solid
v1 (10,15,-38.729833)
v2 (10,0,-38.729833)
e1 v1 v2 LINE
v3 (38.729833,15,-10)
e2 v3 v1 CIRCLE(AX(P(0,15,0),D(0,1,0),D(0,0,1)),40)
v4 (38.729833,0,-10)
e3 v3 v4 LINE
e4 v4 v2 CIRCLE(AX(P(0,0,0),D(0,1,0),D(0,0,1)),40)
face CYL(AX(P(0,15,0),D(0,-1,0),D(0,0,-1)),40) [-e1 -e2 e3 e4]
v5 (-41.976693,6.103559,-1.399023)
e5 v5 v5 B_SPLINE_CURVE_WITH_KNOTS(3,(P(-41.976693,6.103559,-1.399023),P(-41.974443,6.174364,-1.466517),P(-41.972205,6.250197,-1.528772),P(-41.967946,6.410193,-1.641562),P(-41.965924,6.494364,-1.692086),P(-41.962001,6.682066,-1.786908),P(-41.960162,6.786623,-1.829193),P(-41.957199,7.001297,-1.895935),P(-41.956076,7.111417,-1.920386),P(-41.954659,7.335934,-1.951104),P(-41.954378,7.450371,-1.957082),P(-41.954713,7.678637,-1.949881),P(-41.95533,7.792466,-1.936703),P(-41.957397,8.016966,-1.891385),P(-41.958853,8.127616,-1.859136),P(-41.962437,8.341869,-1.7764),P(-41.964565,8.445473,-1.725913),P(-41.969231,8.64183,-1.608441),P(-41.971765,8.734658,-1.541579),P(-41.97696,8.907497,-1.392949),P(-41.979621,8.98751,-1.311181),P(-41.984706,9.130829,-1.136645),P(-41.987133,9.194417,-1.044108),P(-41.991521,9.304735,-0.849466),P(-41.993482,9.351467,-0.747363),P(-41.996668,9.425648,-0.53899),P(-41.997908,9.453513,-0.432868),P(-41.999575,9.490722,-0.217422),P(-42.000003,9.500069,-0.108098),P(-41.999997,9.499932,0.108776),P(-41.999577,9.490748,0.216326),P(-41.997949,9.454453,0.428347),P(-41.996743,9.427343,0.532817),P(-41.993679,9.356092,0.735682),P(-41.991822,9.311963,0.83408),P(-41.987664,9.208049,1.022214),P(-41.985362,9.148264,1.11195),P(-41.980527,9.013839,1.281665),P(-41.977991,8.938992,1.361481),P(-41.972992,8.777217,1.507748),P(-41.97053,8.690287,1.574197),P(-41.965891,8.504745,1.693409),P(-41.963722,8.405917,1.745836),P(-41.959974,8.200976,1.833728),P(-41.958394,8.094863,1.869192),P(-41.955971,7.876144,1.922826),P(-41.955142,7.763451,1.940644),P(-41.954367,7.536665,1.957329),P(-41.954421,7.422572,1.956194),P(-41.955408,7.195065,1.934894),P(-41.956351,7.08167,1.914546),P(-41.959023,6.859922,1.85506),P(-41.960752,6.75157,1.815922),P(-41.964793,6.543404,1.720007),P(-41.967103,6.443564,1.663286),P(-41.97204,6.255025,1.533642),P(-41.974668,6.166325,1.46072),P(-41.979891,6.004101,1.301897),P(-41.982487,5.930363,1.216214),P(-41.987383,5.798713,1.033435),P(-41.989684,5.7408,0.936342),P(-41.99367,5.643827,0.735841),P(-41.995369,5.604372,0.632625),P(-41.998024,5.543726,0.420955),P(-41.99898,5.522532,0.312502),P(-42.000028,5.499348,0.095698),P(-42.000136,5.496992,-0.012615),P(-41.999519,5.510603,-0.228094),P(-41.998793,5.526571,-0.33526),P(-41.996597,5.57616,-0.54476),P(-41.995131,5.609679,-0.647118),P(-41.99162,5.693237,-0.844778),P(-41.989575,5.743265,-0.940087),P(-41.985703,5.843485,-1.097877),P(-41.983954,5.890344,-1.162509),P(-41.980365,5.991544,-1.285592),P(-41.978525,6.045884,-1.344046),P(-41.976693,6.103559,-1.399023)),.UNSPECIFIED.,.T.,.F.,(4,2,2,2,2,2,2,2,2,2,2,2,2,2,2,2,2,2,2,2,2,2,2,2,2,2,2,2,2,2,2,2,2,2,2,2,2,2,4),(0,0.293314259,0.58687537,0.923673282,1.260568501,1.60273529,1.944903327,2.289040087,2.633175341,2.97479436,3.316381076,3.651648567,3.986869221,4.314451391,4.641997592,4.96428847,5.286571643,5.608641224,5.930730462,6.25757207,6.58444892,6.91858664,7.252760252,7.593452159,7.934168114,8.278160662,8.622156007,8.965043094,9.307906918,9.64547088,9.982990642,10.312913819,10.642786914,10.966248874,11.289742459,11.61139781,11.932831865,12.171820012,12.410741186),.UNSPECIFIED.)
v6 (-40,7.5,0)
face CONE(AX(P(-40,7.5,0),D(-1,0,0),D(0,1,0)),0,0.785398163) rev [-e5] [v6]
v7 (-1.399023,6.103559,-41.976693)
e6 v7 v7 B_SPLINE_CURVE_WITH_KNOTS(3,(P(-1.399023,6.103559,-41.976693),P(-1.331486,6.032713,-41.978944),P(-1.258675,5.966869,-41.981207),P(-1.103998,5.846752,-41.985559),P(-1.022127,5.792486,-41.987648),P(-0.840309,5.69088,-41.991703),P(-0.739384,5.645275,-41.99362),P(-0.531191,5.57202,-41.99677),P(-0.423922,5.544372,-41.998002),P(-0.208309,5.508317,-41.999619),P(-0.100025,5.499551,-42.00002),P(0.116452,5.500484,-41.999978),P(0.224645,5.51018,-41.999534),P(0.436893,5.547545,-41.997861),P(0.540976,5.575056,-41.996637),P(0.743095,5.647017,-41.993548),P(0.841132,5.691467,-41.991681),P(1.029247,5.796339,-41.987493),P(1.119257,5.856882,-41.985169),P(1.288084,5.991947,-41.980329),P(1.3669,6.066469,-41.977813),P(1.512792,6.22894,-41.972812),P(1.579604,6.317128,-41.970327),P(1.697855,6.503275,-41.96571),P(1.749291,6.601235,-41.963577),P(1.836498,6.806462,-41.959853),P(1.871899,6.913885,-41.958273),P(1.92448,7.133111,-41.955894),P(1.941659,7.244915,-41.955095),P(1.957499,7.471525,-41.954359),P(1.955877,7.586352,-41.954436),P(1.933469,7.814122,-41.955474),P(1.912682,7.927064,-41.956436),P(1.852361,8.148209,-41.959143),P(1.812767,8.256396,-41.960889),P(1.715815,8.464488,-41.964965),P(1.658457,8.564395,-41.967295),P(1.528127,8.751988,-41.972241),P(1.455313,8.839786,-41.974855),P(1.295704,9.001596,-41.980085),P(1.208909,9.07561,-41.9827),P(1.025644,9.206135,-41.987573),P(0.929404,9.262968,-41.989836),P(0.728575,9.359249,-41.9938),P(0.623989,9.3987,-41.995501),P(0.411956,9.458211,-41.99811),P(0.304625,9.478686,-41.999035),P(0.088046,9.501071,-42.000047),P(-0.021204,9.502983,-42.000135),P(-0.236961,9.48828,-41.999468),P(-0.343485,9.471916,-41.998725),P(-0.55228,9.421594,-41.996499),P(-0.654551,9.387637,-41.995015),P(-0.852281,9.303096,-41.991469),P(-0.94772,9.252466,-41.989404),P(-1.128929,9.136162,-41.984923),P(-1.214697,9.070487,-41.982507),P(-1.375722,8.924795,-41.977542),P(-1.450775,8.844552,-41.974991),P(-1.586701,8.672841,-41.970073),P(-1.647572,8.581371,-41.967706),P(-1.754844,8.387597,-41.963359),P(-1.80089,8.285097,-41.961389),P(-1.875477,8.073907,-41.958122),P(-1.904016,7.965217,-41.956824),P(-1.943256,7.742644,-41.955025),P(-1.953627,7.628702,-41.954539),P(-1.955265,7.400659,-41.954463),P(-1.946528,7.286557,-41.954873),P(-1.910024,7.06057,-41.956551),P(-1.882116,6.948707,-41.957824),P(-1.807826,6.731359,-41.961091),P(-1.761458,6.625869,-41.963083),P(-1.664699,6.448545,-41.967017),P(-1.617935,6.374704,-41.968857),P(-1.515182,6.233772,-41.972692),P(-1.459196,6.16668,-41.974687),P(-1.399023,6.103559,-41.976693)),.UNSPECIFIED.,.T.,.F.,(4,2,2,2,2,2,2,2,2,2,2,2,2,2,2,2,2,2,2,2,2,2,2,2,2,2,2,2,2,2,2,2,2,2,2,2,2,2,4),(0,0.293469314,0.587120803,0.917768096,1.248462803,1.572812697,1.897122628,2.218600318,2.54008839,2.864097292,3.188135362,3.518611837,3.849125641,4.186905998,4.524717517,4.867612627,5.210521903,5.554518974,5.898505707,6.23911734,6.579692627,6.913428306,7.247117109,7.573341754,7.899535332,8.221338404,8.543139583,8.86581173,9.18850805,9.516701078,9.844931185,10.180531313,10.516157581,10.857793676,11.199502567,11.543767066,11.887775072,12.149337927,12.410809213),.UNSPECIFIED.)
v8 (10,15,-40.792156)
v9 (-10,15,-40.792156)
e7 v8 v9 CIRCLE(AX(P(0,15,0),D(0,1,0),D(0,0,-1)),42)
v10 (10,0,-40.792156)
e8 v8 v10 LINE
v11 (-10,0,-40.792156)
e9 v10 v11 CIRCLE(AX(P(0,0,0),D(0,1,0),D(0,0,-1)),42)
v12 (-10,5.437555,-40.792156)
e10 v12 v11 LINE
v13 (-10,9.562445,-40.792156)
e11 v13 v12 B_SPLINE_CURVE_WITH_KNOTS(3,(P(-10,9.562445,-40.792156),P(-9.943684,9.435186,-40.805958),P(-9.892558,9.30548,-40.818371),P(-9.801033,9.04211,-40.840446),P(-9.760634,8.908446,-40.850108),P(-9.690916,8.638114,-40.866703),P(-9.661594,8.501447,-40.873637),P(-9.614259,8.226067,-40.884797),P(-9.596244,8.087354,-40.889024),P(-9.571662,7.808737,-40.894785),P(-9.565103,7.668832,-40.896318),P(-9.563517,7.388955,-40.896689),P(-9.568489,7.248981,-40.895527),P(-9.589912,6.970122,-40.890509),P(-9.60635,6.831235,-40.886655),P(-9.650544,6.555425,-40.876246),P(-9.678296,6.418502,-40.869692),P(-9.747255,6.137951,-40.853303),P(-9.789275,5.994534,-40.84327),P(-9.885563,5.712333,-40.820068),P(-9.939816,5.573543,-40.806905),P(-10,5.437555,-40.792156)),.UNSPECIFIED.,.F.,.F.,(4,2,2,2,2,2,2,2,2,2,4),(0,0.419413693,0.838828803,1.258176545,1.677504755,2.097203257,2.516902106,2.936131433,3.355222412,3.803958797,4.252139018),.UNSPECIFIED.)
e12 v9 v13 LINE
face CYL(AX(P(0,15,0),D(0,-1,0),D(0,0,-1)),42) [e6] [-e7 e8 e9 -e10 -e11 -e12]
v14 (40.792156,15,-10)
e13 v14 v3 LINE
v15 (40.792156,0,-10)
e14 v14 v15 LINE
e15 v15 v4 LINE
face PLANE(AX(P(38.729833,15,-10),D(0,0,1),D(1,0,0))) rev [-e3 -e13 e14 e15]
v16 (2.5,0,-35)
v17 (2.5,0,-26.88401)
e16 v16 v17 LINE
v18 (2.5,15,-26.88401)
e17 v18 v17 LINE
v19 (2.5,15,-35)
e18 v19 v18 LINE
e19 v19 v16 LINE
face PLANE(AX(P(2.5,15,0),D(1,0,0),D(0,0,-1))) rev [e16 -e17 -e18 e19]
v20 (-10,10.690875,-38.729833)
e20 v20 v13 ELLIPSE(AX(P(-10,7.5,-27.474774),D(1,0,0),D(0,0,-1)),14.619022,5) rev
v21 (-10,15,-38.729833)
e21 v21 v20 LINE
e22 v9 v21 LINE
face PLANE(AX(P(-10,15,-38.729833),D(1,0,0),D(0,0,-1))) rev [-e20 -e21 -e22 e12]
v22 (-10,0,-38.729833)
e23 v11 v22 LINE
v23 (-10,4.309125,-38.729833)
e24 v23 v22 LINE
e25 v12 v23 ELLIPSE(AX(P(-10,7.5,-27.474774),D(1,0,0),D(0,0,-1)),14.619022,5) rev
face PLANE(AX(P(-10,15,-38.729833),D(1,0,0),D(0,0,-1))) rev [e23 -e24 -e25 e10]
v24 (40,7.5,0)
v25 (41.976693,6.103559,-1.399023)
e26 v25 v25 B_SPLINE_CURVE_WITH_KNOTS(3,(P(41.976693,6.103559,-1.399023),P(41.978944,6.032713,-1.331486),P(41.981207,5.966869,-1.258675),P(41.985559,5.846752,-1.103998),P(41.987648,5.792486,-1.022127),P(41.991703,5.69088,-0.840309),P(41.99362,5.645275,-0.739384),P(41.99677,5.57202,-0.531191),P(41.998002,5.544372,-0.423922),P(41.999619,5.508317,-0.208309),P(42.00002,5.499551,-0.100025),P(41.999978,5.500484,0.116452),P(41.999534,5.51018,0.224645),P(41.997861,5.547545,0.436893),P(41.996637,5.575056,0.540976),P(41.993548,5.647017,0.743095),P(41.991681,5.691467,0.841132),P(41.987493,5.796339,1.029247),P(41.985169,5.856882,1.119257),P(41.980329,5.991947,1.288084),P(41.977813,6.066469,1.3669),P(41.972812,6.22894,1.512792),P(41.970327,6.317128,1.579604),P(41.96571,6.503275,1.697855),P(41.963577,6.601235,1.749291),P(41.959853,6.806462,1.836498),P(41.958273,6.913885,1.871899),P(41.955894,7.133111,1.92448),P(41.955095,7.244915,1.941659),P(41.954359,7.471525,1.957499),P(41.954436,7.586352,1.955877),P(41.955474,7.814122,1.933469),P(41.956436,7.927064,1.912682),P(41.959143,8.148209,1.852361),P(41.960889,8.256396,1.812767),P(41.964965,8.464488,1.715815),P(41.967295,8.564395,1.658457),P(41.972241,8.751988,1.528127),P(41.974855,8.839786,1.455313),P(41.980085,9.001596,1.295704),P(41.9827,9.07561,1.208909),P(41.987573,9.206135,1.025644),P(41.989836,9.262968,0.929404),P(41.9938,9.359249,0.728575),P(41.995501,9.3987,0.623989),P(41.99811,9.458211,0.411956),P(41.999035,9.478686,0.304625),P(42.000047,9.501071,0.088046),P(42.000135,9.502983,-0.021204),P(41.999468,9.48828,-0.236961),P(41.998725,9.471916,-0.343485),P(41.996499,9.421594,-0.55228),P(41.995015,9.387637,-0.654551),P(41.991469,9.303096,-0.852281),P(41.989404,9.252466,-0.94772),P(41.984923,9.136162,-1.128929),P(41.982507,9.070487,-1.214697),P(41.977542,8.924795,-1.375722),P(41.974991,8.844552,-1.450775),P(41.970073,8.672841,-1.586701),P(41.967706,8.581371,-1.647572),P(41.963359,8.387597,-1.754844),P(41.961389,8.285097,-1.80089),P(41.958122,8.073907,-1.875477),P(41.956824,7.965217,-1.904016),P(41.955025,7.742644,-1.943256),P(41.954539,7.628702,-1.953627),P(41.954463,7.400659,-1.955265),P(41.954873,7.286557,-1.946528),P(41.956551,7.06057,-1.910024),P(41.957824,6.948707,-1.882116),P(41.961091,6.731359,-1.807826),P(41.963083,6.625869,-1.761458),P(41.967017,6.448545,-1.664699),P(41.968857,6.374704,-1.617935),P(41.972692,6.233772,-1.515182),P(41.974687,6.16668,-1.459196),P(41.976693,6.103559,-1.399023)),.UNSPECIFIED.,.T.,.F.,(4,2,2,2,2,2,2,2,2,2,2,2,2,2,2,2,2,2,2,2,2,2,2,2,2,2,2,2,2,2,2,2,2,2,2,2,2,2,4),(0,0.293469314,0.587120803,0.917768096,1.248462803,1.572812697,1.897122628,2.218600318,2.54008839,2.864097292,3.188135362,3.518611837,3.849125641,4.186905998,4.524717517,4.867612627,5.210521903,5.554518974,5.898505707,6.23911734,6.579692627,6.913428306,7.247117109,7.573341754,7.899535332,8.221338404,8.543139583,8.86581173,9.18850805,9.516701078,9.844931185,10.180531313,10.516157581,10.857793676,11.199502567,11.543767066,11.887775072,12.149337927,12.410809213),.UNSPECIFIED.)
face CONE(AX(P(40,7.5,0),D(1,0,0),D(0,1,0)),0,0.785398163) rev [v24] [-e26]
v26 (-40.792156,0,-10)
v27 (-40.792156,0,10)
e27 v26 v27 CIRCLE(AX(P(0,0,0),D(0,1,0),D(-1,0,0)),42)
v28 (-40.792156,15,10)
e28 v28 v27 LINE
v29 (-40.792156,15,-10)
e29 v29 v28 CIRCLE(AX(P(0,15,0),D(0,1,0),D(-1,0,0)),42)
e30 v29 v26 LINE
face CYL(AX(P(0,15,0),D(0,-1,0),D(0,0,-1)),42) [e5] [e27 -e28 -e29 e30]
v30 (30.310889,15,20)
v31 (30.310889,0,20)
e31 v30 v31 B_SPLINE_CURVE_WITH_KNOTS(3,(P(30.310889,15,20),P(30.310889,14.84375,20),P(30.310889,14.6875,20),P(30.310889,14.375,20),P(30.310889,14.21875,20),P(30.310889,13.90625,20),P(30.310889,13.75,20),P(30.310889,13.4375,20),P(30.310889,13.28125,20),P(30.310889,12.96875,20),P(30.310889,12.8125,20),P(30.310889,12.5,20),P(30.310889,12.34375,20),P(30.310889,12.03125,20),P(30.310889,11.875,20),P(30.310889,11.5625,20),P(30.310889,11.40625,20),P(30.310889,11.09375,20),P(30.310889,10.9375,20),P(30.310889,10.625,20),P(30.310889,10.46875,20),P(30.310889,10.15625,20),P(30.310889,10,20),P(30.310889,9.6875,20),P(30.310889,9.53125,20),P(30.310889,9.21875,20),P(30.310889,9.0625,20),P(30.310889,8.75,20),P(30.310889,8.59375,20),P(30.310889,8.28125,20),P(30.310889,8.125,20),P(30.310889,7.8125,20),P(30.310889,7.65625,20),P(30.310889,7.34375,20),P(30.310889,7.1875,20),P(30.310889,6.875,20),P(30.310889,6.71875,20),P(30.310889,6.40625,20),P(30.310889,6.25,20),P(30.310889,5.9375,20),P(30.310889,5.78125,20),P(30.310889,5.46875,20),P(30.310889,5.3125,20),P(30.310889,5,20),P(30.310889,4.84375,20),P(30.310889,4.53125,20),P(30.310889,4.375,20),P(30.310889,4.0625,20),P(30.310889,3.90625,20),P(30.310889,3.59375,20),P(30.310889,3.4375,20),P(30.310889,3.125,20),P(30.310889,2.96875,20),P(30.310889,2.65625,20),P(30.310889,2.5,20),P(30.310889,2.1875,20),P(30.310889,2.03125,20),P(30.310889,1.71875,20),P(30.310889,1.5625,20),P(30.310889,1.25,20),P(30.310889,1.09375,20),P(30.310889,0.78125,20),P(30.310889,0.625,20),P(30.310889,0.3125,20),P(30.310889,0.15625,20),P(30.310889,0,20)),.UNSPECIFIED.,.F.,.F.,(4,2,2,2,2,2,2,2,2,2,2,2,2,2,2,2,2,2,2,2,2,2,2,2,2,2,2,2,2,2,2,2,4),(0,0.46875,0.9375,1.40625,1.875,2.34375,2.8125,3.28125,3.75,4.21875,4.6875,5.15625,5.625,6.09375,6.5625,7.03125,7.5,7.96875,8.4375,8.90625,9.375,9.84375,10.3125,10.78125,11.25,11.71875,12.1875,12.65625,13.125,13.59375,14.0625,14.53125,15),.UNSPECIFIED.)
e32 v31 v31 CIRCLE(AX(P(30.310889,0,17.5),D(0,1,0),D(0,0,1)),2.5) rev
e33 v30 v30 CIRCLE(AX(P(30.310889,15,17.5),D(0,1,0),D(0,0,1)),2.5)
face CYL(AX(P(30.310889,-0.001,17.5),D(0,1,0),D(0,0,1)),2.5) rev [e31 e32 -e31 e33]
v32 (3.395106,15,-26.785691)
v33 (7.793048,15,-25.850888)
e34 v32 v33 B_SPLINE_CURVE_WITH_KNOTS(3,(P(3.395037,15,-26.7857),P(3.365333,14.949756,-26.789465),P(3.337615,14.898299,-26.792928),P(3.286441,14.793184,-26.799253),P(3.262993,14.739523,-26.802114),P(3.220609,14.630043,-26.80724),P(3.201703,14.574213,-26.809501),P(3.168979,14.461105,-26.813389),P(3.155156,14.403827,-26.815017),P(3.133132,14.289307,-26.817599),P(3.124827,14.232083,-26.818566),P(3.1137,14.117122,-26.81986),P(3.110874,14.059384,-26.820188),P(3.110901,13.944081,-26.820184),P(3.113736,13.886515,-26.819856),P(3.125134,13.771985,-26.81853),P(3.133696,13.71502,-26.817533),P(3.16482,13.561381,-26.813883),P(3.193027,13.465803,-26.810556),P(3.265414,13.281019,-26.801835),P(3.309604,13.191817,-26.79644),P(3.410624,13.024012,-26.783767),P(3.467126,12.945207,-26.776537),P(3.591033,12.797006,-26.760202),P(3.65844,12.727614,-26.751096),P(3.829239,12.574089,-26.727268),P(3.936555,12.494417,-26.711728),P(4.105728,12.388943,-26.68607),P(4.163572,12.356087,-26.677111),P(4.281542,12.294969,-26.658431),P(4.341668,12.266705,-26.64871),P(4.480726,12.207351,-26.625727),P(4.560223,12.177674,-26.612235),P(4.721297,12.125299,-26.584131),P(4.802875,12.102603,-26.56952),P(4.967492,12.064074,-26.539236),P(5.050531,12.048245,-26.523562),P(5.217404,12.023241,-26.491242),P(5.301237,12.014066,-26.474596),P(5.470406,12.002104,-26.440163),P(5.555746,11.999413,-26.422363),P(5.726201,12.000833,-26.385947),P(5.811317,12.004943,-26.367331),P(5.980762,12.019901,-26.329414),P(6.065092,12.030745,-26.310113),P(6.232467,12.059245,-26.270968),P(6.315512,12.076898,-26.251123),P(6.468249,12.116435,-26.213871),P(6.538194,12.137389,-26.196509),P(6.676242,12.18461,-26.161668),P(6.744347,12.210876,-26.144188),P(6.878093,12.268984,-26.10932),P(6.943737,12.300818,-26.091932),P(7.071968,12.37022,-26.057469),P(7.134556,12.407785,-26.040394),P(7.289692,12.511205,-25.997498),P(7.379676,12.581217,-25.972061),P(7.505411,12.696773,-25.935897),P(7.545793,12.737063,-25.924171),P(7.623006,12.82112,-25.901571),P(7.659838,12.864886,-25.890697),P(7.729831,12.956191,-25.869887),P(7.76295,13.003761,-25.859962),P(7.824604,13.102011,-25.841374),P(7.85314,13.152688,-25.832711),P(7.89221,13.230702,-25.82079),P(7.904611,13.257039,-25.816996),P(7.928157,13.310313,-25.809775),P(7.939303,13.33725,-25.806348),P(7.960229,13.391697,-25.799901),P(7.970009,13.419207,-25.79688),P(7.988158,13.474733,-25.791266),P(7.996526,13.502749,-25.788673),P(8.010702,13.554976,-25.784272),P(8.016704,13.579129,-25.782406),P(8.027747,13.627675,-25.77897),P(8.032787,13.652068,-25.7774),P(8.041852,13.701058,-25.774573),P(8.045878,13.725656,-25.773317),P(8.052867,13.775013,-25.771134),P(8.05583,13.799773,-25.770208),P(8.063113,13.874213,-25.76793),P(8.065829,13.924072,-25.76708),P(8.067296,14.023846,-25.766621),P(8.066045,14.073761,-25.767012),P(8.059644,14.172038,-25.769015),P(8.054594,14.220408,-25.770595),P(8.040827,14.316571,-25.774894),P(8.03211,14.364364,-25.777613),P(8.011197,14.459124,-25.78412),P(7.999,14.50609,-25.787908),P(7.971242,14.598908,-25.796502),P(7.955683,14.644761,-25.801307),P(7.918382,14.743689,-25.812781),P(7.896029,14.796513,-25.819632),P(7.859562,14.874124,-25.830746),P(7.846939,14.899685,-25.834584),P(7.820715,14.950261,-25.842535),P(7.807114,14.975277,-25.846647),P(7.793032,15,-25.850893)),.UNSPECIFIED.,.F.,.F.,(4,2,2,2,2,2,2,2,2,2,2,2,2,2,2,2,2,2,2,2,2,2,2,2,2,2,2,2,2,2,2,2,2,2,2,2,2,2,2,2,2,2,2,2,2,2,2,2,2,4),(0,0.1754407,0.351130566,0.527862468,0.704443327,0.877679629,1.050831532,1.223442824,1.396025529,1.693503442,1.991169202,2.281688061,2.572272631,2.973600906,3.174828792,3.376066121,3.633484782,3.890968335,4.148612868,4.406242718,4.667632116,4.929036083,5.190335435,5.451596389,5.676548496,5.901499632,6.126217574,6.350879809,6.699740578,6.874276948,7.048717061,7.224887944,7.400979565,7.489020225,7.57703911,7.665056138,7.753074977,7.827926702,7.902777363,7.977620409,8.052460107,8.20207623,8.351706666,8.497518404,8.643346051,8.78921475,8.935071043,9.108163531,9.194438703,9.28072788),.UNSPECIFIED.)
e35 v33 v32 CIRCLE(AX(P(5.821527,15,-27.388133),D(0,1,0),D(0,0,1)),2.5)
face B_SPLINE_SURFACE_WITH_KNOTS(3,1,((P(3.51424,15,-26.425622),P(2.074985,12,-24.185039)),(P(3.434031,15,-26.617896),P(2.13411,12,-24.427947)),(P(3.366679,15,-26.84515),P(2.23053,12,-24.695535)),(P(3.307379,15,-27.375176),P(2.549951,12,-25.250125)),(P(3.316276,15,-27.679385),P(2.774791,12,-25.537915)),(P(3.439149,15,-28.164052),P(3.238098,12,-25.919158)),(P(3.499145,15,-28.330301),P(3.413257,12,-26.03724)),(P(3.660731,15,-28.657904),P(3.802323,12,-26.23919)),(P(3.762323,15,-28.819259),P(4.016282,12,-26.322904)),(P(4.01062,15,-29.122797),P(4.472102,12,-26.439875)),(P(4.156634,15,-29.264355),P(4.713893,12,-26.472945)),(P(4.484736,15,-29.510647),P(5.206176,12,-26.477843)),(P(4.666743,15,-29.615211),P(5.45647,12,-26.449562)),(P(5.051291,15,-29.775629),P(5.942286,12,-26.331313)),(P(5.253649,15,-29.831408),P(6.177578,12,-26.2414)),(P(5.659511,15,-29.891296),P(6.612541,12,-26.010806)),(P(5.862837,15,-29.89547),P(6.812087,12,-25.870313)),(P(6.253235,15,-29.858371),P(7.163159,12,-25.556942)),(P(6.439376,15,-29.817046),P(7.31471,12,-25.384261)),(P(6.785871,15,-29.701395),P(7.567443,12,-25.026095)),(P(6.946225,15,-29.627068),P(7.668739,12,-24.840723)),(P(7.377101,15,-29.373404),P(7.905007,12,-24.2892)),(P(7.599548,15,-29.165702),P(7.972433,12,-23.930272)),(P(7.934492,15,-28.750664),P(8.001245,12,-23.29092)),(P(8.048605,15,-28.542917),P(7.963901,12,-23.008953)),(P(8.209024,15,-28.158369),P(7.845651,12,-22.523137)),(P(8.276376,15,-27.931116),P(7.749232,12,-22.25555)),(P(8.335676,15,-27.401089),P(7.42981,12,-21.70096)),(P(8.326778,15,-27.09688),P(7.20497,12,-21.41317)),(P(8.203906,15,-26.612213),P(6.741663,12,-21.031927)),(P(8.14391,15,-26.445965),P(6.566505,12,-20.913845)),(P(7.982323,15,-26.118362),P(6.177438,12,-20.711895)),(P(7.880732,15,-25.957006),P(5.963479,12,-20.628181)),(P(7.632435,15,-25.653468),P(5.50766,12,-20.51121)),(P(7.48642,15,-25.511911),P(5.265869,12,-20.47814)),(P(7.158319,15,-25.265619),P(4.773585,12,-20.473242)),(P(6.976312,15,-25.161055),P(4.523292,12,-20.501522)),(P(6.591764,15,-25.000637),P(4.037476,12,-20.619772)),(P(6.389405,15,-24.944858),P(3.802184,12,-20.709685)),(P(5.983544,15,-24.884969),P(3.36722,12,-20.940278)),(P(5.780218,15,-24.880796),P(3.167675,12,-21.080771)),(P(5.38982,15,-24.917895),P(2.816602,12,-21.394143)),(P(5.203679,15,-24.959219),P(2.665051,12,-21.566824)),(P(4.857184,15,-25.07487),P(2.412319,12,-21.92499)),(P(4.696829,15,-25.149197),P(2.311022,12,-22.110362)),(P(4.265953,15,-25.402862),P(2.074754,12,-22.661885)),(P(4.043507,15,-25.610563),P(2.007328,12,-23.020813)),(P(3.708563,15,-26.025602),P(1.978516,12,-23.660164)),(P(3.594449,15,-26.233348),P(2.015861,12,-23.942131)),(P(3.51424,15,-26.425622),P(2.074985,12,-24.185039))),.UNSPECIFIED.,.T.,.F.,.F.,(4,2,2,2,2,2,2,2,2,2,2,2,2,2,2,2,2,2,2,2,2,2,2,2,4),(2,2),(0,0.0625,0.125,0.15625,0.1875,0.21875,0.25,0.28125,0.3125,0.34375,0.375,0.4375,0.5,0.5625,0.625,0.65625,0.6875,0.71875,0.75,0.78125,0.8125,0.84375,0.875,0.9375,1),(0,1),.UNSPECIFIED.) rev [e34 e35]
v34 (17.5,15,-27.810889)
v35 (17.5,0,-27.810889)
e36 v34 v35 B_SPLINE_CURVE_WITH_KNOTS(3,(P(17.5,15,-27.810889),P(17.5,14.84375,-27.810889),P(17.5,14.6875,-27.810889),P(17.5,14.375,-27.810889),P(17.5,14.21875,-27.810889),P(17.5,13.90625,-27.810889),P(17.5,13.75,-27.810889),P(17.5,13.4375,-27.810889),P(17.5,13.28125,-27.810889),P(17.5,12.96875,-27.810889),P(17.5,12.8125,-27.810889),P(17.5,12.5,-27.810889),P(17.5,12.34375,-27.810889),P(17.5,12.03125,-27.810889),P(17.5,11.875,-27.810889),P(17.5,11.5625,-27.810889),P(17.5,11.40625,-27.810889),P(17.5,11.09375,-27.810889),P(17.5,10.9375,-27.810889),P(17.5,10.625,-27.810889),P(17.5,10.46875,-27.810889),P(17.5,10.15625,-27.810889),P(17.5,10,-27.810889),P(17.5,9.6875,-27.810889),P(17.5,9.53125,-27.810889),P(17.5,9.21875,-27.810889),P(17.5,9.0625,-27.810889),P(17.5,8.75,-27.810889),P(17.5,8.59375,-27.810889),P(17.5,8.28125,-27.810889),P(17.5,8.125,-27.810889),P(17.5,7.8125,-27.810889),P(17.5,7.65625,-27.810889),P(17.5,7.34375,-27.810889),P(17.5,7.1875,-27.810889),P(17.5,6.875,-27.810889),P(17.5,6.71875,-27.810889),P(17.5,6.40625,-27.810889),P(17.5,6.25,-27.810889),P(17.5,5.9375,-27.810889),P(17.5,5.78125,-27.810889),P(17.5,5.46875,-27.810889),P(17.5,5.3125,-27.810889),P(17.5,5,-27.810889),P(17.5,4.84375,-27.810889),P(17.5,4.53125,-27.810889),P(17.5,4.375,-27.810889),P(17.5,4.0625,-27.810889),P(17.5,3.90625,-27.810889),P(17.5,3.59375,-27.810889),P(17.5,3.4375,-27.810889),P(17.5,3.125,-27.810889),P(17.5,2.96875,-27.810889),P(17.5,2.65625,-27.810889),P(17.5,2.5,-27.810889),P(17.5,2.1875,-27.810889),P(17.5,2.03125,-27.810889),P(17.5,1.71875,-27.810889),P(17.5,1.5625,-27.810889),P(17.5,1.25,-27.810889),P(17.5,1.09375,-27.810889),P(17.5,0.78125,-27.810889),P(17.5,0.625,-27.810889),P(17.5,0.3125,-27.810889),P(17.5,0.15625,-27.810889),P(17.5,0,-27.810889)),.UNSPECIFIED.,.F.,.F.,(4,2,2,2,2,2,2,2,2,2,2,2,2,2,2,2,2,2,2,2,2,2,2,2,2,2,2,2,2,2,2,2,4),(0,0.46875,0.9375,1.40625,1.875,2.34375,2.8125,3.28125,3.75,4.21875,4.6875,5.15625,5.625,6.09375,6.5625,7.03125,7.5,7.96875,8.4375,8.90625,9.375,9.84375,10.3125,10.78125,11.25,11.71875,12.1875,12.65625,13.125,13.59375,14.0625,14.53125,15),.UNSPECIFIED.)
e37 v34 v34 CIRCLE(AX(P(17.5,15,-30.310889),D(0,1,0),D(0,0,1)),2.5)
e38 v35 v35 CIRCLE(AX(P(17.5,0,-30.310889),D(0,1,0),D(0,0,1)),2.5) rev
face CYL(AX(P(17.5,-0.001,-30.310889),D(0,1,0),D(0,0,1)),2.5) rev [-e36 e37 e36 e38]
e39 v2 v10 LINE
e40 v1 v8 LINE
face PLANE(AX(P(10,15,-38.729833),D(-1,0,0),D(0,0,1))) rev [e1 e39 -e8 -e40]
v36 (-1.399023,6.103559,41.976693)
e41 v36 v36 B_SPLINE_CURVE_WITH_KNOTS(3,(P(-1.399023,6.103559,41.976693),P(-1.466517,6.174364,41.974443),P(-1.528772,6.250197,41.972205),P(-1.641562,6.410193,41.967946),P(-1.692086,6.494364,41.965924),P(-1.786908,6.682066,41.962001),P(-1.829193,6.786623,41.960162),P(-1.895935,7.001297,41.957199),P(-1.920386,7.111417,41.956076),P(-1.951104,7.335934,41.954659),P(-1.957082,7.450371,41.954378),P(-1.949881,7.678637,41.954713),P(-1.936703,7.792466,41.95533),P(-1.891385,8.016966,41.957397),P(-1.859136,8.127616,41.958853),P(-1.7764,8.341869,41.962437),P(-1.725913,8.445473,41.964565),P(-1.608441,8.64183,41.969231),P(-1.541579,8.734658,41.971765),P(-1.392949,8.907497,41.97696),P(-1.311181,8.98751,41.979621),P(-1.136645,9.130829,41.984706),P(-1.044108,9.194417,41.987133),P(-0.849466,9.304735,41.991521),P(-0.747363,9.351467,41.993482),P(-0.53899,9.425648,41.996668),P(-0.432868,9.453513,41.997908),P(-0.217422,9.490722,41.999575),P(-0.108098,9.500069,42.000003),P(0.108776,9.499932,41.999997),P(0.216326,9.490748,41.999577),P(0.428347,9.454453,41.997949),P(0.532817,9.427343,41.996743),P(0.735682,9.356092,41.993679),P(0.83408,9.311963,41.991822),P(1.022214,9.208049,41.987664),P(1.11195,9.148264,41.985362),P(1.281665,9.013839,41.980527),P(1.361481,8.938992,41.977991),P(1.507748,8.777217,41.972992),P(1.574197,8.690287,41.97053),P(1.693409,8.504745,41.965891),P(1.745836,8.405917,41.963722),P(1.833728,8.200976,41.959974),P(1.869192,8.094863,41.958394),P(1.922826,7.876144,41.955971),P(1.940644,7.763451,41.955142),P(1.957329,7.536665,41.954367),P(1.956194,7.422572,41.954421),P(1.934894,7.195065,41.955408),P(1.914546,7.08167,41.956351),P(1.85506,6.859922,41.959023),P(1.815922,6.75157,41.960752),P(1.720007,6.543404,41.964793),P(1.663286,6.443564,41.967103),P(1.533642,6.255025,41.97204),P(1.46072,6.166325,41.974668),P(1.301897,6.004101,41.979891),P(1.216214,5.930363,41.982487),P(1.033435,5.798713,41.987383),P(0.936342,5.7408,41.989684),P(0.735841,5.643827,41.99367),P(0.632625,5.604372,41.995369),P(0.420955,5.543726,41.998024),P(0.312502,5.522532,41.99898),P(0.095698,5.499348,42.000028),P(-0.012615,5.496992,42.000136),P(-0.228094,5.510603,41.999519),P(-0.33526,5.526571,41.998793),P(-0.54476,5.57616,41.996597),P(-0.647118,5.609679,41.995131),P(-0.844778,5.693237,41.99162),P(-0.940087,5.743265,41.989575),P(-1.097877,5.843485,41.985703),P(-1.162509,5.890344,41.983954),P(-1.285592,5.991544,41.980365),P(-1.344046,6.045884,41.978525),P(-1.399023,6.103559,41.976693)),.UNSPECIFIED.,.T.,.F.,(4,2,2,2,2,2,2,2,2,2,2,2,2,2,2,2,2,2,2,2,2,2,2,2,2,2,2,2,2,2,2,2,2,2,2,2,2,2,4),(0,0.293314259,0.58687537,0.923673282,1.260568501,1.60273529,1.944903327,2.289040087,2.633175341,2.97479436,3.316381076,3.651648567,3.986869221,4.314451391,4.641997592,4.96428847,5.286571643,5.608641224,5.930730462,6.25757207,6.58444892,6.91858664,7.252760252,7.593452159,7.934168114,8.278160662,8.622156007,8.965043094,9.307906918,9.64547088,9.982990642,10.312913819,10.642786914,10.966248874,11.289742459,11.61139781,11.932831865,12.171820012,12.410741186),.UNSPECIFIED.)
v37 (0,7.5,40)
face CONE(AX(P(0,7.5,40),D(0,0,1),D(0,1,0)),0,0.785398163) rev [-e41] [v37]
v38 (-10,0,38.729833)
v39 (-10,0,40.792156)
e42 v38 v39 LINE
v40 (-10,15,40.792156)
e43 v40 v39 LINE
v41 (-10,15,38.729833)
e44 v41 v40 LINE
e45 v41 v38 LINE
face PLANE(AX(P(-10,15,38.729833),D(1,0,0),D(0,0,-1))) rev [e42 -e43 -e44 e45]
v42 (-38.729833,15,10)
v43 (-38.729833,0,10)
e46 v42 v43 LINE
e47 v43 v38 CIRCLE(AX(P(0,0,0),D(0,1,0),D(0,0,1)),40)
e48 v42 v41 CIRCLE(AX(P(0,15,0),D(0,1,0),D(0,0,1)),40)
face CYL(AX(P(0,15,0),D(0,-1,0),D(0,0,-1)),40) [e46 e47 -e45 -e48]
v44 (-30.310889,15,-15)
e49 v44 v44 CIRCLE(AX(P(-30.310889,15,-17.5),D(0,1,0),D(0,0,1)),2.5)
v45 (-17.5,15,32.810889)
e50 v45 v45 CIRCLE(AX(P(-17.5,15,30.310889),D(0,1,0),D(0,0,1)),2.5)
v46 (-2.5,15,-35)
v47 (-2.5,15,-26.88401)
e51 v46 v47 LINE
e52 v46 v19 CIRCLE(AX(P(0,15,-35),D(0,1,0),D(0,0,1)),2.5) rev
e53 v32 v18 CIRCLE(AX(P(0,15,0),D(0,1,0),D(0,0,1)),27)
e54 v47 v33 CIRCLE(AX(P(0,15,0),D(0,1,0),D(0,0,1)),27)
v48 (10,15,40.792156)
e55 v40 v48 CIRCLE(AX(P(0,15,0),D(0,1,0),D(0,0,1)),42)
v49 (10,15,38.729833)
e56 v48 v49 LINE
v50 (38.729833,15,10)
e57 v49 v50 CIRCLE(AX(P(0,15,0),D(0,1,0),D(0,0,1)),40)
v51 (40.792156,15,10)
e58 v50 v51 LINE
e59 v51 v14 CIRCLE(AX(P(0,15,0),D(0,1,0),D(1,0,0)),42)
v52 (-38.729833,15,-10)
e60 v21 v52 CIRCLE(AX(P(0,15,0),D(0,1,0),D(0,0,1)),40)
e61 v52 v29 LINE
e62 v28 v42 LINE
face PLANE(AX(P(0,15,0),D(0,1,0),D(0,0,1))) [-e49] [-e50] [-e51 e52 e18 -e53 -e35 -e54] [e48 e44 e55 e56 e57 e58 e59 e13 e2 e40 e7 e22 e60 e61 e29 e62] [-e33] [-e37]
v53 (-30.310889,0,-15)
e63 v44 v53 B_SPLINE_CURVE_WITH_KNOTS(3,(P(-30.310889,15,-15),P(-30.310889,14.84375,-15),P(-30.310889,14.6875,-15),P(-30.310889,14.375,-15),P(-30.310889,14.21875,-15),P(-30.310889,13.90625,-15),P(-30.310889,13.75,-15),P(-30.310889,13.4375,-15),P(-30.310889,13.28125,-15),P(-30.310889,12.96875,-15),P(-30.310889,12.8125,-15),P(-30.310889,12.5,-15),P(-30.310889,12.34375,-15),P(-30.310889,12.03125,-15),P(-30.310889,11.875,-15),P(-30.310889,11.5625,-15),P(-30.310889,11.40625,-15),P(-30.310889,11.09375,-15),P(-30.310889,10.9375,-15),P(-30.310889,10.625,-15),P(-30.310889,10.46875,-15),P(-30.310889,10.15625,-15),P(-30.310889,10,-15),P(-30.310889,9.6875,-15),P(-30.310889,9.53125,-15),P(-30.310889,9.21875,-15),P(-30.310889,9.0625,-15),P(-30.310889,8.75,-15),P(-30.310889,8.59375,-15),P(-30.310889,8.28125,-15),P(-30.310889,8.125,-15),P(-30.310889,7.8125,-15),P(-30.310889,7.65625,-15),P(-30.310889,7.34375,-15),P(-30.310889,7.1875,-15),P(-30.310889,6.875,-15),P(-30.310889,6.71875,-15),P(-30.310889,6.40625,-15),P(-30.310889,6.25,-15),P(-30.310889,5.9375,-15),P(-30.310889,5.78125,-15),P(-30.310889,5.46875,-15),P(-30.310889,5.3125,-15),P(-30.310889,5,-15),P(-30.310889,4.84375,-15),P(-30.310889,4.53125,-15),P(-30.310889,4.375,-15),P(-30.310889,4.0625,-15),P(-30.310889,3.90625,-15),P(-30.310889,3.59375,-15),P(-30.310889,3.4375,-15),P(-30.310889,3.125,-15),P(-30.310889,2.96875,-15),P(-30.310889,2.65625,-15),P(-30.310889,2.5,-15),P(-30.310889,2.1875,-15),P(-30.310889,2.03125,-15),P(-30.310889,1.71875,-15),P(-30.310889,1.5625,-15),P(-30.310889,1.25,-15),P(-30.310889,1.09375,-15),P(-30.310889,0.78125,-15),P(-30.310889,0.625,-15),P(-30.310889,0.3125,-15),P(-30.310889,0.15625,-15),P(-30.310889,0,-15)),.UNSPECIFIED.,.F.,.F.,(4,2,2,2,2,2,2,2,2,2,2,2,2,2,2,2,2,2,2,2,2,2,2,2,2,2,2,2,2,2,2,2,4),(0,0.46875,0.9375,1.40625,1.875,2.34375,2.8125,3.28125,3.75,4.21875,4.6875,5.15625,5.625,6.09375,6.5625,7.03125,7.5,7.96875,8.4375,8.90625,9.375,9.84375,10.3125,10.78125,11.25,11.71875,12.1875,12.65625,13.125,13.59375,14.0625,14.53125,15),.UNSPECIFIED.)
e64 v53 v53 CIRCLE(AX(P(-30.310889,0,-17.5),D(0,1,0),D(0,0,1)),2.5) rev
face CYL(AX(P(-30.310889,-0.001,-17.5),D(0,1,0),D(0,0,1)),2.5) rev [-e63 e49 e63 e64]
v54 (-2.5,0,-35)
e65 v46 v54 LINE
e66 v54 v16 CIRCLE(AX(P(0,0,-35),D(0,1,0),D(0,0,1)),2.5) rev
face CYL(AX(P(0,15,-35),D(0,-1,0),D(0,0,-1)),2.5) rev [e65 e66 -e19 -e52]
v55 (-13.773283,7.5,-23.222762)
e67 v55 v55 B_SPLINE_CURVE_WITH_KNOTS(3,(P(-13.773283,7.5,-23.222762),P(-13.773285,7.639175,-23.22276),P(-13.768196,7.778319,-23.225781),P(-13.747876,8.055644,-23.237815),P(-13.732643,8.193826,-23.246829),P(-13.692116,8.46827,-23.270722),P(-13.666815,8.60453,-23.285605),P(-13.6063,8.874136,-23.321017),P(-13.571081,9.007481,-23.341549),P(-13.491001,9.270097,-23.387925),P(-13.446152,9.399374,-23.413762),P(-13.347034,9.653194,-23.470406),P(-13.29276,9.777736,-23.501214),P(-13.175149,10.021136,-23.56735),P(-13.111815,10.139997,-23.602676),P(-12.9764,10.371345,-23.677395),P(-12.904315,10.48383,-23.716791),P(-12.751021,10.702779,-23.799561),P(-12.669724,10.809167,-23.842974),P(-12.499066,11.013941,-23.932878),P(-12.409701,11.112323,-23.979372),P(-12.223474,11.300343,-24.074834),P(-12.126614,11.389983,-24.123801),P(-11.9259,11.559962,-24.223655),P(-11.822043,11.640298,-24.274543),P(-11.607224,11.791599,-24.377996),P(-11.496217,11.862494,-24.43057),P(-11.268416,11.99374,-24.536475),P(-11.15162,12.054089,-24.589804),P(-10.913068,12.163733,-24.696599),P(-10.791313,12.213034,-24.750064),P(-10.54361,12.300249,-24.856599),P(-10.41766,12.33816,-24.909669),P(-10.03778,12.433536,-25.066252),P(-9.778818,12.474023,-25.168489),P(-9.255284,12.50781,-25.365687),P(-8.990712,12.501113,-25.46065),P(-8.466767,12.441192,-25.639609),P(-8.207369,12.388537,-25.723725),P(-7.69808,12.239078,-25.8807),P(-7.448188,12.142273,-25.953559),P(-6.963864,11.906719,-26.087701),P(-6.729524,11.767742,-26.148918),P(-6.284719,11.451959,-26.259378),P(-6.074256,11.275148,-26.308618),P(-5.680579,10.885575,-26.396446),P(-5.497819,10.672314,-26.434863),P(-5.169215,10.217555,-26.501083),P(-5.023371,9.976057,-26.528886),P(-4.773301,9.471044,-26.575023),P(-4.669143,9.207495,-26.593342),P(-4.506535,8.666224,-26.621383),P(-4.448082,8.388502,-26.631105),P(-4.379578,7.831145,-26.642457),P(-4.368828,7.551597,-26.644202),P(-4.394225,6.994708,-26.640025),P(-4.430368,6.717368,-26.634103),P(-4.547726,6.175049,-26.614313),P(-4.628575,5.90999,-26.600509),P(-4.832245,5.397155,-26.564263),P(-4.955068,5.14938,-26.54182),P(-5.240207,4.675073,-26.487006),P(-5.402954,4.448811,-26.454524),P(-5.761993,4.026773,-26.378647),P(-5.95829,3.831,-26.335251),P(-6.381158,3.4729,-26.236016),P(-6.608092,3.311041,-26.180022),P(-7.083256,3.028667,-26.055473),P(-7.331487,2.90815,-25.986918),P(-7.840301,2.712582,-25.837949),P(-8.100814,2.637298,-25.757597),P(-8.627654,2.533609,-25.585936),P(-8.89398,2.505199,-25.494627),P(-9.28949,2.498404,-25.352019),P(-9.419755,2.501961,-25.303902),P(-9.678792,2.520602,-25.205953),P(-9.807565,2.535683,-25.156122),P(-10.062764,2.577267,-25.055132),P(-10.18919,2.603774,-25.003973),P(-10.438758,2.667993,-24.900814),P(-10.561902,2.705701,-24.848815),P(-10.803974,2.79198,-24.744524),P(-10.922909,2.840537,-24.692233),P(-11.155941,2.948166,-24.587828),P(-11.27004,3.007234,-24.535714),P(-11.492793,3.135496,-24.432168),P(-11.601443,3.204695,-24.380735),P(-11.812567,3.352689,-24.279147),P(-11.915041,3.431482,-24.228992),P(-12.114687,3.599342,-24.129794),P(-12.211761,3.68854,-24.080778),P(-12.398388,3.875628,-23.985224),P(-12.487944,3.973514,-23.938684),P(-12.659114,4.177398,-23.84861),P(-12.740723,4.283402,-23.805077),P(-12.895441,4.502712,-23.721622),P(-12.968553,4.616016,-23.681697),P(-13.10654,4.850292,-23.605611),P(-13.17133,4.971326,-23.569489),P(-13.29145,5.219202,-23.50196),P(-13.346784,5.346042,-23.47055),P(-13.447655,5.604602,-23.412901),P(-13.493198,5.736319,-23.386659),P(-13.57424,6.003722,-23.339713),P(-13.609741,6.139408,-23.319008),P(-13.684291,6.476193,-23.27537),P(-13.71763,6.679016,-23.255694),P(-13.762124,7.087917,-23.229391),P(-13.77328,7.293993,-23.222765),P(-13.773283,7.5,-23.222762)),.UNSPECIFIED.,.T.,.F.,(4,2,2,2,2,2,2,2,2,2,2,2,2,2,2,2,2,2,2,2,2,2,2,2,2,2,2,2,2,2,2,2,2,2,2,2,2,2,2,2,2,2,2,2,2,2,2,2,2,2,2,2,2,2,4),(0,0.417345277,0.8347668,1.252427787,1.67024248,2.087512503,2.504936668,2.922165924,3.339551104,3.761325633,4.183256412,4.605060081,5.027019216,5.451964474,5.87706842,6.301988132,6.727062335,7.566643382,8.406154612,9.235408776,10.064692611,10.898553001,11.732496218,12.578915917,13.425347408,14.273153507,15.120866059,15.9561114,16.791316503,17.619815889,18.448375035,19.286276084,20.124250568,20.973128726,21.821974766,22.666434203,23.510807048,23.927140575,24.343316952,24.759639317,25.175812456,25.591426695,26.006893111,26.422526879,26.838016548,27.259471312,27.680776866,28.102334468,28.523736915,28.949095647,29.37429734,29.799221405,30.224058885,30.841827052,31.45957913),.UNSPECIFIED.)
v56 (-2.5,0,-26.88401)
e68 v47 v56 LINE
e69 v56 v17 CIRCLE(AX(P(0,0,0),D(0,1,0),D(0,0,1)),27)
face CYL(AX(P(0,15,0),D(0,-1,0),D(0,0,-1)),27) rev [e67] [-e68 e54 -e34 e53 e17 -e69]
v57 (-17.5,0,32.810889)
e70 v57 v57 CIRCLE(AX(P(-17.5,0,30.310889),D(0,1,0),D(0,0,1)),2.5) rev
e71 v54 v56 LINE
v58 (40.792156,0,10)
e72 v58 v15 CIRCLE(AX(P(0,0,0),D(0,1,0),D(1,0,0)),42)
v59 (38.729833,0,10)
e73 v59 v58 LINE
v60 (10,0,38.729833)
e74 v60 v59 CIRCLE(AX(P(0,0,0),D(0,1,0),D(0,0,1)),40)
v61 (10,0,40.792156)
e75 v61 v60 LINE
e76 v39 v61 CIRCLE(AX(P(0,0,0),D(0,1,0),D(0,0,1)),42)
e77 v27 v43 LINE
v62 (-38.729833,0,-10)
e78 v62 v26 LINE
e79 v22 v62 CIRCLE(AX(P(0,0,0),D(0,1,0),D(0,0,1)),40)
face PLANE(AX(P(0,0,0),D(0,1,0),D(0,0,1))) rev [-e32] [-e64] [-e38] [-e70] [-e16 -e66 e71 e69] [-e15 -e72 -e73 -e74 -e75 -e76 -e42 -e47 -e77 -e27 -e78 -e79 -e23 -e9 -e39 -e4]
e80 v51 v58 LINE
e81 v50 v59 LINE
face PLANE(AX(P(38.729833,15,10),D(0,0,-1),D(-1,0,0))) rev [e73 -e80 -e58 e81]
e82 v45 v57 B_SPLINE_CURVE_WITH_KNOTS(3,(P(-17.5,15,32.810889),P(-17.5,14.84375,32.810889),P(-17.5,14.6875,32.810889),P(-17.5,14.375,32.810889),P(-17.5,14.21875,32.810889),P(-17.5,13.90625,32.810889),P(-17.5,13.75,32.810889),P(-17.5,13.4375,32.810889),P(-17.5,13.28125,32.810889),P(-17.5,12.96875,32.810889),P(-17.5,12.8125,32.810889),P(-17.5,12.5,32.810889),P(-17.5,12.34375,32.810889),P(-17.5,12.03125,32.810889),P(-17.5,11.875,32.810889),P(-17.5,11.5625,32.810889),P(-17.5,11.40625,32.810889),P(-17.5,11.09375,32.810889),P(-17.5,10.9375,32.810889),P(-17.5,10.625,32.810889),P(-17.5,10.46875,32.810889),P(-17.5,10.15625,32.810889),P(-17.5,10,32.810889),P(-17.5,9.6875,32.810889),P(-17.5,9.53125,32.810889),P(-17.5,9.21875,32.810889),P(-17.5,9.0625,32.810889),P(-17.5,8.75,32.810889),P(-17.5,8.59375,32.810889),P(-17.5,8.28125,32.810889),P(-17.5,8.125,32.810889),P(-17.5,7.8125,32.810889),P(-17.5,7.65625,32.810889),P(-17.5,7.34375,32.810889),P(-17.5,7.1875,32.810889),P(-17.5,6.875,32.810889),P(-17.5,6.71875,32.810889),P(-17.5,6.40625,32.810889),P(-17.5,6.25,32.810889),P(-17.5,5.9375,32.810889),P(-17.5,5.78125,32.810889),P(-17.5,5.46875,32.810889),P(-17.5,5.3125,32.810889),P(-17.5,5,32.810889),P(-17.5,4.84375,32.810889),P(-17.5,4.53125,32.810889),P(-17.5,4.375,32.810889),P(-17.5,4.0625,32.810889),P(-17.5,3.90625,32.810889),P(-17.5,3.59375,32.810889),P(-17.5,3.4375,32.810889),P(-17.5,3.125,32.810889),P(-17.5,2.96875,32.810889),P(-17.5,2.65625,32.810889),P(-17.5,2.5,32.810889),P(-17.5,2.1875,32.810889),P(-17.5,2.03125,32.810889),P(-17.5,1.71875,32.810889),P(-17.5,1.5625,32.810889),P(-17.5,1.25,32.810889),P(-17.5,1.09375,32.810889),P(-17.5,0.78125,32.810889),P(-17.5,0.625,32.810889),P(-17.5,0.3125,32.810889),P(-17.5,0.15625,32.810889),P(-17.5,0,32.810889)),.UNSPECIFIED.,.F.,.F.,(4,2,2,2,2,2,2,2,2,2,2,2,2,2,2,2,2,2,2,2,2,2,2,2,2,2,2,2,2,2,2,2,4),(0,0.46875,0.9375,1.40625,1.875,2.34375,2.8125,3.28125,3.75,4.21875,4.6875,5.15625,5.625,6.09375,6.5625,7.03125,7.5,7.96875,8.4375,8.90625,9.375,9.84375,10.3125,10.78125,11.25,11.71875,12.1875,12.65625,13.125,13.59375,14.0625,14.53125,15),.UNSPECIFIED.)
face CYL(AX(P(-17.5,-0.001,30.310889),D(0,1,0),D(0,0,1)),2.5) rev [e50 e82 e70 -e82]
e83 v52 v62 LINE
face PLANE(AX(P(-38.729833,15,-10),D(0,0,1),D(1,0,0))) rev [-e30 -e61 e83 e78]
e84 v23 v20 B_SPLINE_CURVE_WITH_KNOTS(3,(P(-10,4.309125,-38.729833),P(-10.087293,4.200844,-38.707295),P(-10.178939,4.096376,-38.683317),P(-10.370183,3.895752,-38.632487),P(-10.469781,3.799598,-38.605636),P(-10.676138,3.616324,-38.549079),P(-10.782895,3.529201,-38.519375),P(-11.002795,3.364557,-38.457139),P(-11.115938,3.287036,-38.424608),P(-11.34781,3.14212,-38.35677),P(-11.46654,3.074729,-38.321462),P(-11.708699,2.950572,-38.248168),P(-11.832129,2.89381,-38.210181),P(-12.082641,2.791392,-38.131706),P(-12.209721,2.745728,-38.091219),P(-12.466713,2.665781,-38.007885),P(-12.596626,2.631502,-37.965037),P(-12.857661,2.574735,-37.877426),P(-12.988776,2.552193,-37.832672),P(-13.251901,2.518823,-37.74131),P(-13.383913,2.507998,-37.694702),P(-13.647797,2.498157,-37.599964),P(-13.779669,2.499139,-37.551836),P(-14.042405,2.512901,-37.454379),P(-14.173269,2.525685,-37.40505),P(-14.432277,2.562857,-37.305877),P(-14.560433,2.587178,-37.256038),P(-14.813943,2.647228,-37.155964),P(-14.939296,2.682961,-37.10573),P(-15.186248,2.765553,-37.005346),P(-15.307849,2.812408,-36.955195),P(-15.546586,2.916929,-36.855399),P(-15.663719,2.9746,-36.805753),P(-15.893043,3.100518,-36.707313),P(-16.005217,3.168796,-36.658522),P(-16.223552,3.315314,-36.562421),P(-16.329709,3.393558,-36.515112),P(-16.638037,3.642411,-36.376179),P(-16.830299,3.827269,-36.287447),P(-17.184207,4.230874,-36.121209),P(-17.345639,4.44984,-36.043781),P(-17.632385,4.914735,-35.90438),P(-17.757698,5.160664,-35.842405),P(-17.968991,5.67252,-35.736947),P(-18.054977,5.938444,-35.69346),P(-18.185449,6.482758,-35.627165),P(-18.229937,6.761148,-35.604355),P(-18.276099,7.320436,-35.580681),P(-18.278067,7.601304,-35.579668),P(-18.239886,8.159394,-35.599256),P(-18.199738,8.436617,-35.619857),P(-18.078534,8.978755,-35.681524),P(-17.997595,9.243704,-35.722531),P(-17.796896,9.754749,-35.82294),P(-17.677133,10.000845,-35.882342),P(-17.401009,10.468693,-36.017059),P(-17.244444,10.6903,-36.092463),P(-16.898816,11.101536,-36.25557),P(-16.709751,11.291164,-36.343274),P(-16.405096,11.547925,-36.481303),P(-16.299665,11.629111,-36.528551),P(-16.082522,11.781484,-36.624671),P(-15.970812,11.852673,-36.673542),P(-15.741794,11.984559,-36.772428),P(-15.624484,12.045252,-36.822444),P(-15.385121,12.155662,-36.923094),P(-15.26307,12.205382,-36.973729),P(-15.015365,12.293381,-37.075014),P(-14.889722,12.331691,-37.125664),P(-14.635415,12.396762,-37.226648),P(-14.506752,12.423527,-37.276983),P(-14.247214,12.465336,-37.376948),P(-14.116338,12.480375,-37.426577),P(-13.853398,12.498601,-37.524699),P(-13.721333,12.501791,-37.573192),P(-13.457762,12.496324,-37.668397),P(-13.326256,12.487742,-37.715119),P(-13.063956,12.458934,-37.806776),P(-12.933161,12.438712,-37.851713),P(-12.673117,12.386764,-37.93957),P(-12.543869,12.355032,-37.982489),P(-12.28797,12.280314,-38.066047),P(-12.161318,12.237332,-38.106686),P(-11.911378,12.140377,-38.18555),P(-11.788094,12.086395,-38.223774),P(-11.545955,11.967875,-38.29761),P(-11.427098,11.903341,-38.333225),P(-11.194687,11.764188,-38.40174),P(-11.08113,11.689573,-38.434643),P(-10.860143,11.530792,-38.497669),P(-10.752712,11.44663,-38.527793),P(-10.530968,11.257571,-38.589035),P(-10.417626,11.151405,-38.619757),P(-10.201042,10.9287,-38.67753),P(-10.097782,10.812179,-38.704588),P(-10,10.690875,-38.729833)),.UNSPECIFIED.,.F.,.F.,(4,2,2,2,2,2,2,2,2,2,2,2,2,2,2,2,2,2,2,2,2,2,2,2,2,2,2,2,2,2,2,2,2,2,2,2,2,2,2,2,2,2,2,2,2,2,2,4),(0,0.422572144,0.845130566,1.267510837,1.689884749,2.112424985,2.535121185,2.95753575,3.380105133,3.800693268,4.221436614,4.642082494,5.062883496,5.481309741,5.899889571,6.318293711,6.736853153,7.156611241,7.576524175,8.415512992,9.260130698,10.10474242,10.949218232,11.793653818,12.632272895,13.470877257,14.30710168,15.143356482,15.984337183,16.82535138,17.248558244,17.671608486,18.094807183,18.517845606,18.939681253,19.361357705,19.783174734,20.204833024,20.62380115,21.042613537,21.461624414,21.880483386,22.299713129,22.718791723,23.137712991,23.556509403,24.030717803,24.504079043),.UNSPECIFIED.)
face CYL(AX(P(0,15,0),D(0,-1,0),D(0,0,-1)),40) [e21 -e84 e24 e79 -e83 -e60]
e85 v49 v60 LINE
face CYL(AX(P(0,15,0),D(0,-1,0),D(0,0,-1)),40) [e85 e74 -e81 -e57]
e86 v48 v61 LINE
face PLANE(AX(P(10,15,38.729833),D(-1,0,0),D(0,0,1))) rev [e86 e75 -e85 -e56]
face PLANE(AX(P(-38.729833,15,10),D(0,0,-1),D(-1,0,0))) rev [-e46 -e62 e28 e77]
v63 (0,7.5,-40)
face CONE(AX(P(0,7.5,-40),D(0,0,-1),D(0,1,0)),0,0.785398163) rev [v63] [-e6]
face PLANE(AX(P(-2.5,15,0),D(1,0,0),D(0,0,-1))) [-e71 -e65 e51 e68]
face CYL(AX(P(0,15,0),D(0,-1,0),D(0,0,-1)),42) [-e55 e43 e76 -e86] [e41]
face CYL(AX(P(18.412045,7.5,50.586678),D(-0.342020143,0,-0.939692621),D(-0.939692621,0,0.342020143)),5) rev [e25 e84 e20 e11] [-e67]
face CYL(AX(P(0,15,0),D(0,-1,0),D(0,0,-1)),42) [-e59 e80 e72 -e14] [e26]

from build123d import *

# Parameters (mm, degrees)
SKETCH1_R               = 40
BOSS_EXTRUDE1_DEPTH     = 15
BOSS_EXTRUDE2_DEPTH     = 15
CIRPATTERN1_COUNT       = 4
CUT_EXTRUDE1_REACH      = 102.194
CUT_EXTRUDE1_END_RADIUS = 27
SKETCH3_R               = 5
CUT_EXTRUDE2_REACH      = 63.262
SKETCH7_R               = 2.5
CIRPATTERN2_COUNT       = 4


with BuildPart() as part:
    # Sketch1 → Boss-Extrude1 (new body)
    with BuildSketch(Plane(origin=(0, 0, 0), x_dir=(1, 0, 0), z_dir=(0, 1, 0))):
        with Locations(Location((0, 0, 0), (0, 0, 270))):
            Circle(SKETCH1_R)
        with BuildLine():
            Line((-2.5, 26.884010118), (-2.5, 35))
            ThreePointArc((-2.5, 35), (0, 37.5), (2.5, 35))
            Line((2.5, 35), (2.5, 26.884010118))
            ThreePointArc((2.5, 26.884010118), (19.956202043, 18.186533479), (27, 0))
            ThreePointArc((27, 0), (-18.186533479, -19.956202043), (-2.5, 26.884010118))
        make_face(mode=Mode.SUBTRACT)
    extrude(amount=BOSS_EXTRUDE1_DEPTH)

    # Sketch2 → Boss-Extrude2 (add)
    with BuildSketch(Plane(origin=(0, 0, 0), x_dir=(1, 0, 0), z_dir=(0, 1, 0))):
        with BuildLine():
            Line((-10, 38.729833462), (-10, 40.792156109))
            ThreePointArc((-10, 40.792156109), (0, 42), (10, 40.792156109))
            Line((10, 40.792156109), (10, 38.729833462))
            ThreePointArc((10, 38.729833462), (0, 40), (-10, 38.729833462))
        make_face()
    boss_extrude2 = extrude(amount=BOSS_EXTRUDE2_DEPTH)

    # CirPattern1: Boss-Extrude2 ×4 about axis
    cirpattern1_axis = Axis((0, 0, 0), (0, 1, 0))
    for i in range(1, CIRPATTERN1_COUNT):
        add(boss_extrude2.rotate(cirpattern1_axis, i * 360 / CIRPATTERN1_COUNT))

    # Cut-Extrude1: up to this cylinder (the profile starts outside it)
    cut_extrude1_end = Plane(origin=(0, 7.5, 0), z_dir=(0, -1, 0)) * Cylinder(CUT_EXTRUDE1_END_RADIUS, 259.388, mode=Mode.PRIVATE)
    # Sketch3 → Cut-Extrude1 (cut, up to the surface)
    with BuildSketch(Plane(origin=(-14.36484602, 0, -39.467090073), x_dir=(0, -1, 0), z_dir=(-0.34202014332566616, 0, -0.9396926207859094)), mode=Mode.PRIVATE) as cut_extrude1_sk1:
        with Locations(Location((-7.5, 0, 0), (0, 0, 90))):
            Circle(SKETCH3_R)
    cut_extrude1_tool1 = extrude(cut_extrude1_sk1.sketch, amount=-CUT_EXTRUDE1_REACH, mode=Mode.PRIVATE) - cut_extrude1_end
    add(cut_extrude1_tool1.solids().sort_by_distance((-14.364846, 7.5, -39.46709))[0], mode=Mode.SUBTRACT)

    # Cut-Loft1: read off the stored shape, not the designer's step
    # Cut-Loft1: loft between two sections, ruled curve by curve
    cut_loft1_from = [
        Edge.make_bspline([(3.514240275, 15, -26.425622361), (3.43403107, 15, -26.617896283), (3.366678926, 15, -26.845149984), (3.307378731, 15, -27.375176333), (3.316276229, 15, -27.679385236), (3.439149004, 15, -28.164052423), (3.499144635, 15, -28.33030076), (3.660731431, 15, -28.657904123), (3.762322597, 15, -28.819259148), (4.01061992, 15, -29.122797357), (4.156634299, 15, -29.264354751), (4.484735709, 15, -29.510646827), (4.666742961, 15, -29.615210684), (5.051290806, 15, -29.775629094), (5.253649364, 15, -29.831407709), (5.659510988, 15, -29.891296475), (5.862836528, 15, -29.895470114), (6.253234588, 15, -29.858370786), (6.439375692, 15, -29.817046477), (6.785871072, 15, -29.701395244), (6.946225348, 15, -29.627068321), (7.37710147, 15, -29.373403645), (7.599547955, 15, -29.165702458), (7.934492045, 15, -28.750664024), (8.048605206, 15, -28.542917202), (8.209023616, 15, -28.158369358), (8.27637576, 15, -27.931115657), (8.335675954, 15, -27.401089308), (8.326778456, 15, -27.096880405), (8.203905682, 15, -26.612213219), (8.143910051, 15, -26.445964881), (7.982323255, 15, -26.118361518), (7.880732089, 15, -25.957006493), (7.632434766, 15, -25.653468284), (7.486420387, 15, -25.51191089), (7.158318977, 15, -25.265618814), (6.976311725, 15, -25.161054957), (6.59176388, 15, -25.000636547), (6.389405322, 15, -24.944857932), (5.983543698, 15, -24.884969166), (5.780218158, 15, -24.880795527), (5.389820098, 15, -24.917894855), (5.203678994, 15, -24.959219164), (4.857183614, 15, -25.074870397), (4.696829338, 15, -25.14919732), (4.265953216, 15, -25.402861996), (4.043506731, 15, -25.610563184), (3.708562641, 15, -26.025601617), (3.59444948, 15, -26.233348439), (3.514240275, 15, -26.425622361)], [0, 0, 0, 0, 0.0625, 0.0625, 0.125, 0.125, 0.15625, 0.15625, 0.1875, 0.1875, 0.21875, 0.21875, 0.25, 0.25, 0.28125, 0.28125, 0.3125, 0.3125, 0.34375, 0.34375, 0.375, 0.375, 0.4375, 0.4375, 0.5, 0.5, 0.5625, 0.5625, 0.625, 0.625, 0.65625, 0.65625, 0.6875, 0.6875, 0.71875, 0.71875, 0.75, 0.75, 0.78125, 0.78125, 0.8125, 0.8125, 0.84375, 0.84375, 0.875, 0.875, 0.9375, 0.9375, 1, 1, 1, 1], 3),
    ]
    cut_loft1_to = [
        Edge.make_bspline([(2.074985381, 12, -24.185039409), (2.13411013, 12, -24.427947342), (2.230529651, 12, -24.695535226), (2.549951041, 12, -25.250125143), (2.77479132, 12, -25.537914734), (3.238098263, 12, -25.919158327), (3.413256539, 12, -26.037240227), (3.802322838, 12, -26.239189581), (4.016282358, 12, -26.322904324), (4.47210154, 12, -26.439875089), (4.713892566, 12, -26.472945015), (5.206175894, 12, -26.477842878), (5.456469637, 12, -26.449562366), (5.942285504, 12, -26.331312867), (6.177577655, 12, -26.241399857), (6.612541462, 12, -26.010806383), (6.812086613, 12, -25.870313491), (7.163158835, 12, -25.556942174), (7.314710473, 12, -25.384260574), (7.567442578, 12, -25.026094956), (7.668738965, 12, -24.840722901), (7.90500687, 12, -24.28920003), (7.972433417, 12, -23.93027154), (8.001244839, 12, -23.290920383), (7.963900528, 12, -23.00895336), (7.845651029, 12, -22.523137493), (7.749231508, 12, -22.255549609), (7.429810118, 12, -21.700959692), (7.204969839, 12, -21.413170101), (6.741662897, 12, -21.031926508), (6.56650462, 12, -20.913844608), (6.177438321, 12, -20.711895254), (5.963478802, 12, -20.628180512), (5.507659619, 12, -20.511209746), (5.265868593, 12, -20.47813982), (4.773585266, 12, -20.473241957), (4.523291522, 12, -20.50152247), (4.037475655, 12, -20.619771968), (3.802183505, 12, -20.709684978), (3.367219697, 12, -20.940278452), (3.167674546, 12, -21.080771344), (2.816602324, 12, -21.394142661), (2.665050687, 12, -21.566824261), (2.412318581, 12, -21.924989879), (2.311022194, 12, -22.110361934), (2.074754289, 12, -22.661884805), (2.007327743, 12, -23.020813295), (1.97851632, 12, -23.660164452), (2.015860632, 12, -23.942131475), (2.074985381, 12, -24.185039409)], [0, 0, 0, 0, 0.0625, 0.0625, 0.125, 0.125, 0.15625, 0.15625, 0.1875, 0.1875, 0.21875, 0.21875, 0.25, 0.25, 0.28125, 0.28125, 0.3125, 0.3125, 0.34375, 0.34375, 0.375, 0.375, 0.4375, 0.4375, 0.5, 0.5, 0.5625, 0.5625, 0.625, 0.625, 0.65625, 0.65625, 0.6875, 0.6875, 0.71875, 0.71875, 0.75, 0.75, 0.78125, 0.78125, 0.8125, 0.8125, 0.84375, 0.84375, 0.875, 0.875, 0.9375, 0.9375, 1, 1, 1, 1], 3),
    ]
    cut_loft1 = Solid(Shell([*[Face.make_surface_from_curves(cut_loft1_from[k], cut_loft1_to[k]) for k in range(1)], Face(Wire(cut_loft1_from)), Face(Wire(cut_loft1_to))]))
    add(cut_loft1, mode=Mode.SUBTRACT)

    # Sketch7 → Cut-Extrude2 (cut, up to next)
    with BuildSketch(Plane(origin=(0, 15, 0), x_dir=(1, 0, 0), z_dir=(0, 1, 0)), mode=Mode.PRIVATE) as cut_extrude2_sk1:
        with Locations(Location((17.5, 30.310889132, 0), (0, 0, 270))):
            Circle(SKETCH7_R)
    cut_extrude2_tool1 = extrude(cut_extrude2_sk1.sketch, amount=-CUT_EXTRUDE2_REACH, mode=Mode.PRIVATE) & part.part
    # Sketch7 → Cut-Extrude2 (cut, up to next)
    with BuildSketch(Plane(origin=(0, 15, 0), x_dir=(1, 0, 0), z_dir=(0, 1, 0)), mode=Mode.PRIVATE) as cut_extrude2_sk2:
        with Locations(Location((30.310889132, -17.5, 0), (0, 0, 270))):
            Circle(SKETCH7_R)
    cut_extrude2_tool2 = extrude(cut_extrude2_sk2.sketch, amount=-CUT_EXTRUDE2_REACH, mode=Mode.PRIVATE) & part.part
    # Sketch7 → Cut-Extrude2 (cut, up to next)
    with BuildSketch(Plane(origin=(0, 15, 0), x_dir=(1, 0, 0), z_dir=(0, 1, 0)), mode=Mode.PRIVATE) as cut_extrude2_sk3:
        with Locations(Location((-17.5, -30.310889132, 0), (0, 0, 270))):
            Circle(SKETCH7_R)
    cut_extrude2_tool3 = extrude(cut_extrude2_sk3.sketch, amount=-CUT_EXTRUDE2_REACH, mode=Mode.PRIVATE) & part.part
    # Sketch7 → Cut-Extrude2 (cut, up to next)
    with BuildSketch(Plane(origin=(0, 15, 0), x_dir=(1, 0, 0), z_dir=(0, 1, 0)), mode=Mode.PRIVATE) as cut_extrude2_sk4:
        with Locations(Location((-30.310889132, 17.5, 0), (0, 0, 270))):
            Circle(SKETCH7_R)
    cut_extrude2_tool4 = extrude(cut_extrude2_sk4.sketch, amount=-CUT_EXTRUDE2_REACH, mode=Mode.PRIVATE) & part.part
    add(cut_extrude2_tool1.solids().sort_by_distance((17.5, 15, -30.310889))[0], mode=Mode.SUBTRACT)
    add(cut_extrude2_tool2.solids().sort_by_distance((30.310889, 15, 17.5))[0], mode=Mode.SUBTRACT)
    add(cut_extrude2_tool3.solids().sort_by_distance((-17.5, 15, 30.310889))[0], mode=Mode.SUBTRACT)
    add(cut_extrude2_tool4.solids().sort_by_distance((-30.310889, 15, -17.5))[0], mode=Mode.SUBTRACT)

    # Sketch9 → Cut-Revolve4 (revolve, cut)
    with BuildSketch(Plane(origin=(0, 0, 0), x_dir=(0, 0, -1), z_dir=(1, 0, 0)), mode=Mode.PRIVATE) as cut_revolve4_sk:
        Polygon((42, 7.5), (42, 5.5), (40, 7.5), align=None)
    cut_revolve4 = revolve(cut_revolve4_sk.sketch.rotate(Axis((0, 7.5, -40), (0, 0, -1)), 180), axis=Axis((0, 7.5, -40), (0, 0, -1)), mode=Mode.SUBTRACT)

    # CirPattern2: Cut-Revolve4 ×4 about axis
    cirpattern2_axis = Axis((0, 15, 0), (0, -1, 0))
    for i in range(1, CIRPATTERN2_COUNT):
        add(cut_revolve4.rotate(cirpattern2_axis, i * 360 / CIRPATTERN2_COUNT), mode=Mode.SUBTRACT)


solid = part.part
